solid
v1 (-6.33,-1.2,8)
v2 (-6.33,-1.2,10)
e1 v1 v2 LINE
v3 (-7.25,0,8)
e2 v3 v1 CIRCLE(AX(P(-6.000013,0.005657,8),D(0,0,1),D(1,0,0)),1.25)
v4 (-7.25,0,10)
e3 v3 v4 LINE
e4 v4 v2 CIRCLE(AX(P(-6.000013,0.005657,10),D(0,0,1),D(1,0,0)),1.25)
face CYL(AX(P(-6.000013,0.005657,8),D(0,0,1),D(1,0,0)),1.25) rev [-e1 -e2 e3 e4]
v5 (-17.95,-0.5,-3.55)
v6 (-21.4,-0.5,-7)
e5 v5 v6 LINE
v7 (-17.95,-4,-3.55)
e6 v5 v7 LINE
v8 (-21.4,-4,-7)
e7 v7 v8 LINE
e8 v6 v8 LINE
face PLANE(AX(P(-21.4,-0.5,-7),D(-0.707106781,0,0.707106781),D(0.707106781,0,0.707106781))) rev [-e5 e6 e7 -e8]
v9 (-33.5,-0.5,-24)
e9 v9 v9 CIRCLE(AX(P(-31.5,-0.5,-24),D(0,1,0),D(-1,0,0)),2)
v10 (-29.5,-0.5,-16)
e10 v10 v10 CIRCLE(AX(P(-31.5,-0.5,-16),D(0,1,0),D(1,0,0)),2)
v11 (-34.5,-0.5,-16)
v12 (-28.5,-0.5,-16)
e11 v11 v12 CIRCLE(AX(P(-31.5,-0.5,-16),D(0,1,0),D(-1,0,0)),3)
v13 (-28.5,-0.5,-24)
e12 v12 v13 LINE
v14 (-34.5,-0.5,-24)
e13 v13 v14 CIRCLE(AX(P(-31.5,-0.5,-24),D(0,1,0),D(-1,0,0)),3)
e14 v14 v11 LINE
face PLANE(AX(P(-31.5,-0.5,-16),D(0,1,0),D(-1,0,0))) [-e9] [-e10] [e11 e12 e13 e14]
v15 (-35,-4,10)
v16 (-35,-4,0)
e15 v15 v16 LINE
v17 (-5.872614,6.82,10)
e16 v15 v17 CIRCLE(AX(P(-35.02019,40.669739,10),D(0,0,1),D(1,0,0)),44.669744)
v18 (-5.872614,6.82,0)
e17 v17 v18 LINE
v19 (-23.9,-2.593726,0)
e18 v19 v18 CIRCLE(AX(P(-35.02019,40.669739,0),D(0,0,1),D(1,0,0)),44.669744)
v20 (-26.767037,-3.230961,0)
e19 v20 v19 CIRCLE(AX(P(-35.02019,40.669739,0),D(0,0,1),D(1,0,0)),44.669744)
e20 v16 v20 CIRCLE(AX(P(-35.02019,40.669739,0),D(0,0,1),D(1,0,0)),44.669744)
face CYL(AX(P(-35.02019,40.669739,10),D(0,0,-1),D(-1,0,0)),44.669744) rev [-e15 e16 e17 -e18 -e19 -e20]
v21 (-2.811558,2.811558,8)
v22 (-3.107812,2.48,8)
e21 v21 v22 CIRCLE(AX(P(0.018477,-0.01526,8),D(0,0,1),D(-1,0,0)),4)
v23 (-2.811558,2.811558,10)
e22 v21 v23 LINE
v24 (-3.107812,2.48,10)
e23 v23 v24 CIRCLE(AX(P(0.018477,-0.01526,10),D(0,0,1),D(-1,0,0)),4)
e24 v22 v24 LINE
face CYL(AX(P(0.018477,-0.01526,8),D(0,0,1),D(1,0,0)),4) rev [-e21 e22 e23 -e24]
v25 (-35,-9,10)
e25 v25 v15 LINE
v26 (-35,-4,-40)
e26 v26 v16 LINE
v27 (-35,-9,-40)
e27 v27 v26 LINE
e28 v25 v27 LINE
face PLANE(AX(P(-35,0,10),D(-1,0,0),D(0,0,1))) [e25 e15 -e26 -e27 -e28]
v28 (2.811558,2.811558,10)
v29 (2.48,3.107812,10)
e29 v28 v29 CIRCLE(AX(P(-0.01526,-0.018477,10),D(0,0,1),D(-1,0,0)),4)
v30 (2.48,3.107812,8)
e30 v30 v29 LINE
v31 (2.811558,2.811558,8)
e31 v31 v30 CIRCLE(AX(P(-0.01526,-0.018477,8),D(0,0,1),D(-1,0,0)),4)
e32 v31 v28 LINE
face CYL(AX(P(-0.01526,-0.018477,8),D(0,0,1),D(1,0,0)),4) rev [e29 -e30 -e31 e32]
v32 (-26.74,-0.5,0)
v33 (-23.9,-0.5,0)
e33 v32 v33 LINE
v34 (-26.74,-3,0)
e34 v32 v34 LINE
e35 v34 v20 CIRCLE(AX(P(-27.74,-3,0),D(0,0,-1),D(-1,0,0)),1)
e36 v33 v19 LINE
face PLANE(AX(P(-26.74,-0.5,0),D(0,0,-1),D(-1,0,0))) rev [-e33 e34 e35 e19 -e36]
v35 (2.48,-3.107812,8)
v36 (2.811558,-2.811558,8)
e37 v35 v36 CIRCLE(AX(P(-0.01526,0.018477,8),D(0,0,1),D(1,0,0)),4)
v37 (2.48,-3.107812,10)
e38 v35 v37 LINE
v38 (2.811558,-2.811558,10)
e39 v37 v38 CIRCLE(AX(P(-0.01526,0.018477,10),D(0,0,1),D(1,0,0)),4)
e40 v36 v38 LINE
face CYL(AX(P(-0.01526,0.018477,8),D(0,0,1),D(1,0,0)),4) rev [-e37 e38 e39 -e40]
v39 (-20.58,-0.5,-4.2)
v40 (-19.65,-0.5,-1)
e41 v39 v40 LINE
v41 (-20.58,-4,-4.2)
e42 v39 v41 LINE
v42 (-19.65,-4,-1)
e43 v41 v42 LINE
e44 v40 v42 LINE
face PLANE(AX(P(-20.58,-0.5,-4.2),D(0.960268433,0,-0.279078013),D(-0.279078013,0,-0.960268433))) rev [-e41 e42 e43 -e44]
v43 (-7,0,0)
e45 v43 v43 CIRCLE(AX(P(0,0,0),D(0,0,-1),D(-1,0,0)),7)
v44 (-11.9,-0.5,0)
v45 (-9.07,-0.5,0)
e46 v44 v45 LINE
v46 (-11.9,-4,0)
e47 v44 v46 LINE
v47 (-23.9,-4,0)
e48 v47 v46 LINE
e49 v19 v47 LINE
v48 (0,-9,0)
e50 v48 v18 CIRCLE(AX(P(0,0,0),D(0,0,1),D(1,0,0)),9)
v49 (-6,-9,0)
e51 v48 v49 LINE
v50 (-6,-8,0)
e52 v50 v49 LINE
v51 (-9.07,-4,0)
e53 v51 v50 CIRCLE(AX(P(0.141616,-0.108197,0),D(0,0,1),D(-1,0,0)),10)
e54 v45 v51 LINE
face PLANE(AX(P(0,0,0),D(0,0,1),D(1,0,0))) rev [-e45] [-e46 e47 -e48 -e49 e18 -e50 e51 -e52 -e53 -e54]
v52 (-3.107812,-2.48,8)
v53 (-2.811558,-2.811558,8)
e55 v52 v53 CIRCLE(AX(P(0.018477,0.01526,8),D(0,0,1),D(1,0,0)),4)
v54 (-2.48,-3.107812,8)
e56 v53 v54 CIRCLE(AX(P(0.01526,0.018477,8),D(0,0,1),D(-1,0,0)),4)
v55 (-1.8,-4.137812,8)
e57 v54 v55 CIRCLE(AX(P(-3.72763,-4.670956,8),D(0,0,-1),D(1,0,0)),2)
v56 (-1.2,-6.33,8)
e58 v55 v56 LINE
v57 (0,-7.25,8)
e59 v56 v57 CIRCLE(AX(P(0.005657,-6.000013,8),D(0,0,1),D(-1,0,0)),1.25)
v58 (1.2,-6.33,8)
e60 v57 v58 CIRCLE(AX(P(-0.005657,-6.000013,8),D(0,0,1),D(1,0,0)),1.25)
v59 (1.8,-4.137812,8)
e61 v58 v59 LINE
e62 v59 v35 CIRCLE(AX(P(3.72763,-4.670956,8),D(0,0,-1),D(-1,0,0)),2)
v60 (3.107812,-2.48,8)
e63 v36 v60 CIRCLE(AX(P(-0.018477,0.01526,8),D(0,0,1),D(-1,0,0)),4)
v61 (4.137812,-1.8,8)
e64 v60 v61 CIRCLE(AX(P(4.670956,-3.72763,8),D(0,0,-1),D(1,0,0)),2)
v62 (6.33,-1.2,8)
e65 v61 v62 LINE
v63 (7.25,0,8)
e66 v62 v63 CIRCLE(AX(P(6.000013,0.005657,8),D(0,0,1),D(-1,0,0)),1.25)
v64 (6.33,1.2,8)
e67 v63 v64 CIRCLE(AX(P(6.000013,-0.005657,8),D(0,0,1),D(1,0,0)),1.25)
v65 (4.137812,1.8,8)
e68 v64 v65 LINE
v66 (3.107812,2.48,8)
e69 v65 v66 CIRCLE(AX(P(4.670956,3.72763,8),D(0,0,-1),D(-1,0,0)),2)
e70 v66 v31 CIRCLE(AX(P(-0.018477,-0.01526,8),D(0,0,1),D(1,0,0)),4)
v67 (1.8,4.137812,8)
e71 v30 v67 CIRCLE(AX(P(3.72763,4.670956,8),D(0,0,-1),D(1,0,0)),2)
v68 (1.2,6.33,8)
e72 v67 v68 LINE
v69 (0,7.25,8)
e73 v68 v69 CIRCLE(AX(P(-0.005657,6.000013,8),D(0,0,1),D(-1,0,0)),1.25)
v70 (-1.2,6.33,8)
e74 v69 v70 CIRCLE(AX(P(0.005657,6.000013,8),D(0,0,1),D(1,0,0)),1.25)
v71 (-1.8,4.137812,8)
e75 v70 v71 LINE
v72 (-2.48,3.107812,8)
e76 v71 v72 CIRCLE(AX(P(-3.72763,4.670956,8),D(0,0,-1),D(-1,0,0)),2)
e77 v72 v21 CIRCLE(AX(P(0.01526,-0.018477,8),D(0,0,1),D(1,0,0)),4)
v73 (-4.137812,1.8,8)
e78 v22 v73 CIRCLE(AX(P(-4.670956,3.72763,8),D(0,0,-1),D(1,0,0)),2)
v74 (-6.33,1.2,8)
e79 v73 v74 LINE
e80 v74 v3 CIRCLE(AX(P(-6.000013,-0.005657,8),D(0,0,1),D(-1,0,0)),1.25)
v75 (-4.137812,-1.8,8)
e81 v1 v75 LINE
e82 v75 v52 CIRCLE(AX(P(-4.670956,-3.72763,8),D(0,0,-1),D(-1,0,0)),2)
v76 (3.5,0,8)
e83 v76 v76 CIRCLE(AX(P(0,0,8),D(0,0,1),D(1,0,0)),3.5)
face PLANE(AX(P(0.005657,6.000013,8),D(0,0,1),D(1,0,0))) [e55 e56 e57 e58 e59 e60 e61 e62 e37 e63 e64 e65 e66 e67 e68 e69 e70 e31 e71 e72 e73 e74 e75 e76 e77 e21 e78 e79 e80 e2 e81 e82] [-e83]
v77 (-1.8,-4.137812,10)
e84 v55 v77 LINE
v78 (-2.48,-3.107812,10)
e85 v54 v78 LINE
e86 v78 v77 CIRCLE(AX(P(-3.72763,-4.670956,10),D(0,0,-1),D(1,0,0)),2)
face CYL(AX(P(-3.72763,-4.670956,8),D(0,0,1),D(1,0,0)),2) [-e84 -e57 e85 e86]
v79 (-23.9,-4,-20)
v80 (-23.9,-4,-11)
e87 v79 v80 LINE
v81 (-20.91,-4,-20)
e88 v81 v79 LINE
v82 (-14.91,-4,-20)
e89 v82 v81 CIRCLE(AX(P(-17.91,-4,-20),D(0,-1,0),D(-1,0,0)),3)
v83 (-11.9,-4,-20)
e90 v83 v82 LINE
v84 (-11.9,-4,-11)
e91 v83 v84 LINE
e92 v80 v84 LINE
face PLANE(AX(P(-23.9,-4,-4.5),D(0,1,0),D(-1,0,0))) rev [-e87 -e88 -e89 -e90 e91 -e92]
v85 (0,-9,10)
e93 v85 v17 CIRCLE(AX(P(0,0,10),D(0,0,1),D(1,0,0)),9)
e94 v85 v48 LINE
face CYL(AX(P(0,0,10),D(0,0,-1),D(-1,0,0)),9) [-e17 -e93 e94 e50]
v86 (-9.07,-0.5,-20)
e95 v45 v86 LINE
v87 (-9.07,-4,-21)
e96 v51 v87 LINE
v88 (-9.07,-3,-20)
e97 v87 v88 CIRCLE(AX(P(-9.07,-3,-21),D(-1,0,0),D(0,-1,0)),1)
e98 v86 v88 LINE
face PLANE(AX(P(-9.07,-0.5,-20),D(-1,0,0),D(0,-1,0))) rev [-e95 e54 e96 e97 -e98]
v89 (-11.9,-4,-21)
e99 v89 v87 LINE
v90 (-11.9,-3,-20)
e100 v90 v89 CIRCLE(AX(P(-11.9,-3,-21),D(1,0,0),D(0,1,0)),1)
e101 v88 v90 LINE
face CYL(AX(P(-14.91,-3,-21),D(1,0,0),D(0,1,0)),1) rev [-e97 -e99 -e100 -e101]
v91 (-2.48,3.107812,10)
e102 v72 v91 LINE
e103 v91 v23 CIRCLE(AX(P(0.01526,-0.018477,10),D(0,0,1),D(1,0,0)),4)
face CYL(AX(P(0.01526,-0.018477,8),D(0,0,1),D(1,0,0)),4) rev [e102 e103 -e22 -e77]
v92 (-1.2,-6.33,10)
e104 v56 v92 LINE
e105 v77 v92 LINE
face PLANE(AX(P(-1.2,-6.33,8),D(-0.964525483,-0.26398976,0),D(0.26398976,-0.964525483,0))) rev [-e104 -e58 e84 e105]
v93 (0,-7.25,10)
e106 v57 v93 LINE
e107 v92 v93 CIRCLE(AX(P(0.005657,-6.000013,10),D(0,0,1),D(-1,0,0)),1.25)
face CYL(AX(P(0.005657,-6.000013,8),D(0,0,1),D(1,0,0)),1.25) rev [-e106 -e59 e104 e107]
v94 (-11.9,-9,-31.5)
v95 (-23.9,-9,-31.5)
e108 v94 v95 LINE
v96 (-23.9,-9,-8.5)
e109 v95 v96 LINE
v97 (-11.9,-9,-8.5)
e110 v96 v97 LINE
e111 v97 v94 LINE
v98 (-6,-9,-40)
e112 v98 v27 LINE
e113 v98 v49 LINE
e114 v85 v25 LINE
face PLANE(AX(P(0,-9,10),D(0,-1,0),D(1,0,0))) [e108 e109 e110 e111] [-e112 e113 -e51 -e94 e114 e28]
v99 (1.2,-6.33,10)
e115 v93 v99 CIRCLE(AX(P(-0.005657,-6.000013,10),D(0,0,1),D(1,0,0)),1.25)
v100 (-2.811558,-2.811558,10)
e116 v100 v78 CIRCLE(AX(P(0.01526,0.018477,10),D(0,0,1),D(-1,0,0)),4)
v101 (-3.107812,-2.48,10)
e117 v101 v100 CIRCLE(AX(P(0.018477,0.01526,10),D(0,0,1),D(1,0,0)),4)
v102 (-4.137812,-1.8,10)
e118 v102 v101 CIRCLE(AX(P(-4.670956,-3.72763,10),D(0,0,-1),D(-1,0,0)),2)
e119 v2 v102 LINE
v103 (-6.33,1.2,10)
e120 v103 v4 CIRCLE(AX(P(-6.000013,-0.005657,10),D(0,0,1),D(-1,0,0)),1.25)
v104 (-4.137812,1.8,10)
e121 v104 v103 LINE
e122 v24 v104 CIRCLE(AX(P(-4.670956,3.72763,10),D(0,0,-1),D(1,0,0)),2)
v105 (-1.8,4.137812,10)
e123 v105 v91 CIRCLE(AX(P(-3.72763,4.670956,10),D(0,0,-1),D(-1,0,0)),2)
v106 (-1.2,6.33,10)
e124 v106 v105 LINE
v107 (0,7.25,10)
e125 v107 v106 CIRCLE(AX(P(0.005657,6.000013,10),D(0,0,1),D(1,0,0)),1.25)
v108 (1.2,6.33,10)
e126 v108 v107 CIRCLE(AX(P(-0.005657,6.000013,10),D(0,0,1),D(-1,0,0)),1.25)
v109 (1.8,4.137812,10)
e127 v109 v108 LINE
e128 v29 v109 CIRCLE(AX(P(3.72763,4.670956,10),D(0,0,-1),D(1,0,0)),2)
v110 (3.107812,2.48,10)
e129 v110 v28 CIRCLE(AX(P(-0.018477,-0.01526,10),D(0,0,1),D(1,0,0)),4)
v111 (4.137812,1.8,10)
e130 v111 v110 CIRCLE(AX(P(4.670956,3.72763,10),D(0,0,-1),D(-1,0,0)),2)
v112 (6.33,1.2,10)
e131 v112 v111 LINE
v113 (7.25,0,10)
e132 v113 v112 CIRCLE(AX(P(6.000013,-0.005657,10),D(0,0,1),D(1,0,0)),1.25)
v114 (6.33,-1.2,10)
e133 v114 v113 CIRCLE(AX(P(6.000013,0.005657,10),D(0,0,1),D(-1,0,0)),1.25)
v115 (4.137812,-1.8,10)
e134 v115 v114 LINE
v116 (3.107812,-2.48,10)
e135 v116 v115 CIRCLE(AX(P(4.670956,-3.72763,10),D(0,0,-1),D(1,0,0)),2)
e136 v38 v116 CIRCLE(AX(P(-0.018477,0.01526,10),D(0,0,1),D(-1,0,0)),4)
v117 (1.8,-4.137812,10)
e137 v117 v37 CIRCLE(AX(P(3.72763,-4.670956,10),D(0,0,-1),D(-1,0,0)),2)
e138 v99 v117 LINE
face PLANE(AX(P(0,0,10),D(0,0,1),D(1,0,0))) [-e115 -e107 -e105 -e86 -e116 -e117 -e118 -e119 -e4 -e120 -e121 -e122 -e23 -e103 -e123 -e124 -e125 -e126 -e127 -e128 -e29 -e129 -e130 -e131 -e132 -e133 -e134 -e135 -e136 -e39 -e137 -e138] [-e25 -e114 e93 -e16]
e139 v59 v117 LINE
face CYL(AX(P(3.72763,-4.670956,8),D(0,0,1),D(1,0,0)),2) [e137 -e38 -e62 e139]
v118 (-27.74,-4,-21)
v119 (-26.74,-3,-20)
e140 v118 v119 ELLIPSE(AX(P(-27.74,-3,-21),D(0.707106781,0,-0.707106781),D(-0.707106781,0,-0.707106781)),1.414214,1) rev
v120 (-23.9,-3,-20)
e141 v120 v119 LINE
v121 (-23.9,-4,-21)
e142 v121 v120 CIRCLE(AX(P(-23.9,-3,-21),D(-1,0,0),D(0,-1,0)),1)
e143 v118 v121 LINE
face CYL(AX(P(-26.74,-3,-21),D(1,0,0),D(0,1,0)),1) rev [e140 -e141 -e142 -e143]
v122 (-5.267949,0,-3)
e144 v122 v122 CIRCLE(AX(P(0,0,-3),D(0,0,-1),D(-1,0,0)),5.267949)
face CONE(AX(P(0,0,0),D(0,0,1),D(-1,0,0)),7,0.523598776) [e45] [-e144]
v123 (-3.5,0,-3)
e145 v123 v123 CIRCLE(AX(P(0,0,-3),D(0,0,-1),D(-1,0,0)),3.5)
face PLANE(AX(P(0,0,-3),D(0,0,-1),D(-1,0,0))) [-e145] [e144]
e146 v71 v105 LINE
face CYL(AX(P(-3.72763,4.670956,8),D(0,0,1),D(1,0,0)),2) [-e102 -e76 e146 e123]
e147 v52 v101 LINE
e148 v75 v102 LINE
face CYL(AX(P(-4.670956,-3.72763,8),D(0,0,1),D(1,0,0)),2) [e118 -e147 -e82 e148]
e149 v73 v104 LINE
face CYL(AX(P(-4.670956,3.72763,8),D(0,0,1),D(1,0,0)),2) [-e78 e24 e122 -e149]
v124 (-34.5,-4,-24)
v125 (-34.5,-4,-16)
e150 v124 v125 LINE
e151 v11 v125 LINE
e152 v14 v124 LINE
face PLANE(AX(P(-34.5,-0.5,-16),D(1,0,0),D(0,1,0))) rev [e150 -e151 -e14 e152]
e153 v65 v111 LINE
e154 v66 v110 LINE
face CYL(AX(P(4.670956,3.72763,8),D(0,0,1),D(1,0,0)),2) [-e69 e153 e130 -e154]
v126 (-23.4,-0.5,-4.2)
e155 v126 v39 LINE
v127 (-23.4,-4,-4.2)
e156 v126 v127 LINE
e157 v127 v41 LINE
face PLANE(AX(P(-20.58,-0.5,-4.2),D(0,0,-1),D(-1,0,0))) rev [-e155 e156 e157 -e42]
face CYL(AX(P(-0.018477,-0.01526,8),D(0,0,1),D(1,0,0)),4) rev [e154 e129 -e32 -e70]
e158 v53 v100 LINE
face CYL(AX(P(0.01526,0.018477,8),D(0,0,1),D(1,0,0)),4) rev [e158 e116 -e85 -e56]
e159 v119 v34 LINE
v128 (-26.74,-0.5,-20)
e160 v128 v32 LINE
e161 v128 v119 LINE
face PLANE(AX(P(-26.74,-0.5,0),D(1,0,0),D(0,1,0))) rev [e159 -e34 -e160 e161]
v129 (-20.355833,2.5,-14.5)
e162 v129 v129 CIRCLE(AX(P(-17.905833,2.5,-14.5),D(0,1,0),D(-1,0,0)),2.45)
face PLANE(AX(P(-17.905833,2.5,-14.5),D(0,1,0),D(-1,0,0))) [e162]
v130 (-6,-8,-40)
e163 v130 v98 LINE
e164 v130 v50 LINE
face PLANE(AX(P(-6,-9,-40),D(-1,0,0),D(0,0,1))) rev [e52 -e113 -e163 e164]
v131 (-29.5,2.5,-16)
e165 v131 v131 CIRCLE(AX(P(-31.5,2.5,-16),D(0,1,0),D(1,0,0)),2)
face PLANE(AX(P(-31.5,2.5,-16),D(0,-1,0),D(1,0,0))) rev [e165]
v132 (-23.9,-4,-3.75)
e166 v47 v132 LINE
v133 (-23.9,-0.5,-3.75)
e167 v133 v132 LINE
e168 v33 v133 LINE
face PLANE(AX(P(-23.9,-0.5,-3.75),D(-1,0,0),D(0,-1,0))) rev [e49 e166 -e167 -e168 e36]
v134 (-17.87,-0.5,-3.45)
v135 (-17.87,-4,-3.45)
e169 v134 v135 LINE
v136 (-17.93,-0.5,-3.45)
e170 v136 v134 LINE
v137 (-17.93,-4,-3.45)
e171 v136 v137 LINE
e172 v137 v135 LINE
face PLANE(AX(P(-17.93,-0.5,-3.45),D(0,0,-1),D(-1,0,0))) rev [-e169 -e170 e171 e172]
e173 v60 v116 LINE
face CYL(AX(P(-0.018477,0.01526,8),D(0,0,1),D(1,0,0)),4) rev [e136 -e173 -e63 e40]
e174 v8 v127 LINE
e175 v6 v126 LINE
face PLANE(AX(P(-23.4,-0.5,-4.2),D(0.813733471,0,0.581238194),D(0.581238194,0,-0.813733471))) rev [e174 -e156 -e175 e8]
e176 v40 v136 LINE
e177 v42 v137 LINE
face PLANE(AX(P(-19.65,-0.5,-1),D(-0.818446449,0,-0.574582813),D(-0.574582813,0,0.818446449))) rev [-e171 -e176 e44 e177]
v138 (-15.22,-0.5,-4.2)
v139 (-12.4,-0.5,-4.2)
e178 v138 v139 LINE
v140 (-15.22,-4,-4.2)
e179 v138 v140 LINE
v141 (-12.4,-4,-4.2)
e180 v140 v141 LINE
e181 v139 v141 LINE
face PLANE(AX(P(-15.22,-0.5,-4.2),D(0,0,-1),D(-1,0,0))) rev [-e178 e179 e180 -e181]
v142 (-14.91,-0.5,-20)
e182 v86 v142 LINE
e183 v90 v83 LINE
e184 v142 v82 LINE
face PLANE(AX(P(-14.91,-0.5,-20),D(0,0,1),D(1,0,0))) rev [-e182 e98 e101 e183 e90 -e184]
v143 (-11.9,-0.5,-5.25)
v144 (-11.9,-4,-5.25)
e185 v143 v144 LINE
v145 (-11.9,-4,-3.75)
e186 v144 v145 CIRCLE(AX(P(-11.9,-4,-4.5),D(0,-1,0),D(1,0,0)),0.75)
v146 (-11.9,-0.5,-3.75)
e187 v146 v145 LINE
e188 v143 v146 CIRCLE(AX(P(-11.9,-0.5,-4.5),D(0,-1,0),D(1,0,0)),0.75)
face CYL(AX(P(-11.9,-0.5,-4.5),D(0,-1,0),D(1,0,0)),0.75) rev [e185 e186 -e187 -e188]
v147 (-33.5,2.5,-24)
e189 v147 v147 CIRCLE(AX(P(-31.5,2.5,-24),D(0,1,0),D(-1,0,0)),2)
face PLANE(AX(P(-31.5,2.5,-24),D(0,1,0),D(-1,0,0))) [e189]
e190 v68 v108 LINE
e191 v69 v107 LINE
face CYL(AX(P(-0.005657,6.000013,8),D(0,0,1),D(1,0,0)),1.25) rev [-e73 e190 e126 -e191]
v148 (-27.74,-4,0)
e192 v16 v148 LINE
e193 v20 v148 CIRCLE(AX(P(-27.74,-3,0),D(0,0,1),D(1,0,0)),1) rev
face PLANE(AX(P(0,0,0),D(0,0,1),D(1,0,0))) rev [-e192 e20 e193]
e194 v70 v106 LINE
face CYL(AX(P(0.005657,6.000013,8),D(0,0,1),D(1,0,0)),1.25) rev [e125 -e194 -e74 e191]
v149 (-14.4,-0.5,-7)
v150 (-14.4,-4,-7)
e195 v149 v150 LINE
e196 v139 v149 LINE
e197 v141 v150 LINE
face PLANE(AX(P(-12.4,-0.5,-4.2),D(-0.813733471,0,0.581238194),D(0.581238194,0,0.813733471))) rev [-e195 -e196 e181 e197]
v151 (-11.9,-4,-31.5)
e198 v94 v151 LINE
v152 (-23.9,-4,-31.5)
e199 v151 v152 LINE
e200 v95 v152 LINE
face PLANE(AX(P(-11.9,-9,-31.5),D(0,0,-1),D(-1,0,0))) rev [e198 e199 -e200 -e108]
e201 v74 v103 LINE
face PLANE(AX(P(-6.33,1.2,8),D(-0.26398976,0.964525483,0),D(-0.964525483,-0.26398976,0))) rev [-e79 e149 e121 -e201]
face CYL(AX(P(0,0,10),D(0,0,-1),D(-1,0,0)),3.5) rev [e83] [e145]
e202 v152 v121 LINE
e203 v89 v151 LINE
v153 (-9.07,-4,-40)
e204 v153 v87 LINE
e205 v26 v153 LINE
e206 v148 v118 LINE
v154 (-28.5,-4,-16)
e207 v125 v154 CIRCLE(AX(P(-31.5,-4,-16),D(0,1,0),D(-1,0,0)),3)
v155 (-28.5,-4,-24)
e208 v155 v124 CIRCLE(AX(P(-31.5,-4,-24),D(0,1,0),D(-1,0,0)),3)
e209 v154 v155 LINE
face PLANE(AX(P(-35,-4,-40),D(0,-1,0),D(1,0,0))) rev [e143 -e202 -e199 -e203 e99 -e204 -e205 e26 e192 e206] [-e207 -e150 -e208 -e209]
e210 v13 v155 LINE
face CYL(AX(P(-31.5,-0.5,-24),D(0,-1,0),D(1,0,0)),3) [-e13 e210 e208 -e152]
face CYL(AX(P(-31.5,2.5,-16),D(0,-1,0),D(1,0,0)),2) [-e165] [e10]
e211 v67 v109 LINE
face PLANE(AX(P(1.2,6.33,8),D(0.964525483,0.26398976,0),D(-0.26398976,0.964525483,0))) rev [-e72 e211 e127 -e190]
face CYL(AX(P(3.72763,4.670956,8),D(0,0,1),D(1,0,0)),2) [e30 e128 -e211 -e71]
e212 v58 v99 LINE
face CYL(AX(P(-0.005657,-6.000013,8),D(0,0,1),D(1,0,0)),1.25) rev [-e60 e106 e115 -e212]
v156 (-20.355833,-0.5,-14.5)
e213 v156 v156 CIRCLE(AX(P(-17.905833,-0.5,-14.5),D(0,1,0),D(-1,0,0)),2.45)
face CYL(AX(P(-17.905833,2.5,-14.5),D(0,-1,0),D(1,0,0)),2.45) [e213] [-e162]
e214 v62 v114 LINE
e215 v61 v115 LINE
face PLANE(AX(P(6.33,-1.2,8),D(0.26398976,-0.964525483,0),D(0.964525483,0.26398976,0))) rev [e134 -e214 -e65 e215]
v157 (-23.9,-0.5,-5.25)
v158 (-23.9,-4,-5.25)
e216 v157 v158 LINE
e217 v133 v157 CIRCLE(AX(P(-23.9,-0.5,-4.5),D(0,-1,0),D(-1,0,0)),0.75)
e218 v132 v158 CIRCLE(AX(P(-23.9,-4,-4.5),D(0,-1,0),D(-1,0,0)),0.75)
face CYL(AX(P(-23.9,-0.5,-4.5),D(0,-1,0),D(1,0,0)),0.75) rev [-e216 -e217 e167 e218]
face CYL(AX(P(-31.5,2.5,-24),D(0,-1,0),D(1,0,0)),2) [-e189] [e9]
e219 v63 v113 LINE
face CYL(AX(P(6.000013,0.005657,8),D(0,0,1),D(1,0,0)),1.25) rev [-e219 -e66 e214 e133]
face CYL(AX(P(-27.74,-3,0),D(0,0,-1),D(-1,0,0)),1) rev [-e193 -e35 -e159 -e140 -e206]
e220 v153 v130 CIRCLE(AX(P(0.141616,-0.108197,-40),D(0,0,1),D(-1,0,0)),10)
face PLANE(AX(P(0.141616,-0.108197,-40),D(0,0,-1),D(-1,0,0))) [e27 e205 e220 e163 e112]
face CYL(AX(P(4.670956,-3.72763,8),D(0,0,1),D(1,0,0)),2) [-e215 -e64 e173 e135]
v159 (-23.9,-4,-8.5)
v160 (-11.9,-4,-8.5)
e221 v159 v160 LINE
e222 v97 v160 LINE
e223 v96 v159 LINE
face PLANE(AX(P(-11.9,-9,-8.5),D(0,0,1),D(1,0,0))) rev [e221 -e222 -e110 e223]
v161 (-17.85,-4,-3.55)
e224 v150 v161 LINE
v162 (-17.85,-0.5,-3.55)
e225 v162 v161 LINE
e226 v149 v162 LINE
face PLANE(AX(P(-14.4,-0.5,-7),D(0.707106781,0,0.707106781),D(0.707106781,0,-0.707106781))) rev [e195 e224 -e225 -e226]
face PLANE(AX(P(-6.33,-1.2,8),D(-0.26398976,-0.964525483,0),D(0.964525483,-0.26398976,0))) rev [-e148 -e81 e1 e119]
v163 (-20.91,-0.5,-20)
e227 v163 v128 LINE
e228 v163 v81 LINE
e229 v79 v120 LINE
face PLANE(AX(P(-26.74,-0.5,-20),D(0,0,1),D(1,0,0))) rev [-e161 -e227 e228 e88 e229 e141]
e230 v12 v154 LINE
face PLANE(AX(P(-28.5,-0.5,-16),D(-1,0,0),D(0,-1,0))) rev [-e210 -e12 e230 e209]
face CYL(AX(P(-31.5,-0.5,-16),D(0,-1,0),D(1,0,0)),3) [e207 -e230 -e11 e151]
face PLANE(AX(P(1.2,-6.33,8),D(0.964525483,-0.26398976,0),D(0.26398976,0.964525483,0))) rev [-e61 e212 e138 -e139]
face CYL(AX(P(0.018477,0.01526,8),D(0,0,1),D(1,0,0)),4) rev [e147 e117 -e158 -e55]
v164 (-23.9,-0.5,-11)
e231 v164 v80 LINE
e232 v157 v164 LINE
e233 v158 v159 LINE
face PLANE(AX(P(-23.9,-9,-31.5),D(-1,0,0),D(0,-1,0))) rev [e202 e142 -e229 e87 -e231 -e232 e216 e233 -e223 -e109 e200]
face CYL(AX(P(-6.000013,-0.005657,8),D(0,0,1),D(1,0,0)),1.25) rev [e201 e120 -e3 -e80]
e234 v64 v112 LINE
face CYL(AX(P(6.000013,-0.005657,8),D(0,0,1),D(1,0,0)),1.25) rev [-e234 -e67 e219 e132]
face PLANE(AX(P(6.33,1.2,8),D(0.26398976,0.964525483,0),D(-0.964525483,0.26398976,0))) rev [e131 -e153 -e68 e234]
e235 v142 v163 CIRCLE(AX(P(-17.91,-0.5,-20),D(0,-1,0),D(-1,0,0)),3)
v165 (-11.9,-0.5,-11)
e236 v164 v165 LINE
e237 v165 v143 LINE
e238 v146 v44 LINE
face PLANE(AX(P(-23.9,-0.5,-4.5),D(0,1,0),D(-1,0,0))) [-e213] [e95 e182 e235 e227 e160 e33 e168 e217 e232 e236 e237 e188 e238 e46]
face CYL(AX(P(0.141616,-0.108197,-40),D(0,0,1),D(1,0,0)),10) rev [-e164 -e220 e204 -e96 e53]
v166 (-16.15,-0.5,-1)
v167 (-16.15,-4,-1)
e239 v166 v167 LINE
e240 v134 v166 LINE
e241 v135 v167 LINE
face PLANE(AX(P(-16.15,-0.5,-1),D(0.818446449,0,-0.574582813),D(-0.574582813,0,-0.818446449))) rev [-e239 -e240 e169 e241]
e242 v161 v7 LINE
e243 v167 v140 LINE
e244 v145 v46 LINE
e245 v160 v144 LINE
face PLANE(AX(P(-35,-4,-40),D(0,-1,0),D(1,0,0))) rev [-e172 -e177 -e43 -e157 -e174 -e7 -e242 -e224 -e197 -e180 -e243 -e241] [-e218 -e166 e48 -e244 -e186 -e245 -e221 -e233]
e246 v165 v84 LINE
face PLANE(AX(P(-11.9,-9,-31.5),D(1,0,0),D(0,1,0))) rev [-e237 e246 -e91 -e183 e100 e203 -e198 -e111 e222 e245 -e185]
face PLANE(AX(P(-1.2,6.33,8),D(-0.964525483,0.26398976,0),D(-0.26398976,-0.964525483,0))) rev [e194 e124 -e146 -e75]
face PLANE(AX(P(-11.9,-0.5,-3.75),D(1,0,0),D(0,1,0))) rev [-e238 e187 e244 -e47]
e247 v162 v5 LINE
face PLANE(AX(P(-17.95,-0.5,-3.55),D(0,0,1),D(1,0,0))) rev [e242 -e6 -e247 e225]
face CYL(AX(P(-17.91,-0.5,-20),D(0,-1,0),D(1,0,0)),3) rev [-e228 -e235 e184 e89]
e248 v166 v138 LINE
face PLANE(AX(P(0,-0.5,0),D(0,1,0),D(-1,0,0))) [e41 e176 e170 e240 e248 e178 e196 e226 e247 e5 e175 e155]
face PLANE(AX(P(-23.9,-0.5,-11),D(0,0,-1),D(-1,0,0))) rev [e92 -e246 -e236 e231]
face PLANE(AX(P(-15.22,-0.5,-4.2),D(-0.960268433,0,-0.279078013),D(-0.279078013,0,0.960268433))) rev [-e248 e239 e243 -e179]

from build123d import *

# Parameters (mm, degrees)
SKETCH2_R           = 9
BOSS_EXTRUDE1_DEPTH = 10
SKETCH3_R           = 7
BOSS_EXTRUDE2_DEPTH = 3
BOSS_EXTRUDE2_TAPER = 30
CUT_EXTRUDE1_DEPTH  = 2
BOSS_EXTRUDE3_DEPTH = 40
SKETCH6_W           = 12
SKETCH6_H           = 23
CUT_EXTRUDE3_DEPTH  = 55.717456081
BOSS_EXTRUDE4_DEPTH = 3.5
SKETCH8_R           = 2
BOSS_EXTRUDE5_DEPTH = 3
SKETCH9_R           = 3.5
CUT_EXTRUDE4_DEPTH  = 52.720402164
BOSS_EXTRUDE6_DEPTH = 3.5
SKETCH11_R          = 2.45
BOSS_EXTRUDE7_DEPTH = 3
BOSS_EXTRUDE9_DEPTH = 3.5
FILLET1_START       = -26.74
FILLET1_DEPTH       = 2.84
FILLET1_START_2     = -11.9
FILLET1_2_DEPTH     = 2.83
FILLET1_START_3     = -21
FILLET1_3_DEPTH     = 21
FILLET1_START_4     = -27.74
FILLET1_4_DEPTH     = 1


with BuildPart() as part:
    # Sketch2 → Boss-Extrude1 (new body)
    with BuildSketch(Plane.XY):
        with BuildLine():
            Line((-35, -9), (0, -9))
            ThreePointArc((0, -9), (-8.437416666, -3.132091953), (-5.872614409, 6.82))
            ThreePointArc((-5.872614409, 6.82), (-19.465199243, -1.204217751), (-35, -4))
            Line((-35, -4), (-35, -9))
        make_face()
        Circle(SKETCH2_R)
    extrude(amount=BOSS_EXTRUDE1_DEPTH)

    # Sketch3 → Boss-Extrude2 (add)
    with BuildSketch(Plane(origin=(0, 0, 0), x_dir=(-1, 0, 0), z_dir=(0, 0, -1))):
        Circle(SKETCH3_R)
    extrude(amount=BOSS_EXTRUDE2_DEPTH, taper=BOSS_EXTRUDE2_TAPER)

    # Sketch4 → Cut-Extrude1 (cut)
    with BuildSketch(Plane.XY.offset(10)):
        with BuildLine():
            Line((1.2, -6.33), (1.8, -4.1378116))
            ThreePointArc((1.8, -4.1378116), (2.058560194, -3.569045514), (2.48, -3.1078116))
            ThreePointArc((2.48, -3.1078116), (2.64989874, -2.964295475), (2.811558399, -2.811558399))
            ThreePointArc((2.811558399, -2.811558399), (2.964295475, -2.64989874), (3.1078116, -2.48))
            ThreePointArc((3.1078116, -2.48), (3.569045514, -2.058560194), (4.1378116, -1.8))
            Line((4.1378116, -1.8), (6.33, -1.2))
            ThreePointArc((6.33, -1.2), (6.992020752, -0.754882576), (7.25, 0))
            ThreePointArc((7.25, 0), (6.992020752, 0.754882576), (6.33, 1.2))
            Line((6.33, 1.2), (4.1378116, 1.8))
            ThreePointArc((4.1378116, 1.8), (3.569045514, 2.058560194), (3.1078116, 2.48))
            ThreePointArc((3.1078116, 2.48), (2.964295475, 2.64989874), (2.811558399, 2.811558399))
            ThreePointArc((2.811558399, 2.811558399), (2.64989874, 2.964295475), (2.48, 3.1078116))
            ThreePointArc((2.48, 3.1078116), (2.058560194, 3.569045514), (1.8, 4.1378116))
            Line((1.8, 4.1378116), (1.2, 6.33))
            ThreePointArc((1.2, 6.33), (0.754882576, 6.992020752), (0, 7.25))
            ThreePointArc((0, 7.25), (-0.754882576, 6.992020752), (-1.2, 6.33))
            Line((-1.2, 6.33), (-1.8, 4.1378116))
            ThreePointArc((-1.8, 4.1378116), (-2.058560194, 3.569045514), (-2.48, 3.1078116))
            ThreePointArc((-2.48, 3.1078116), (-2.64989874, 2.964295475), (-2.811558399, 2.811558399))
            ThreePointArc((-2.811558399, 2.811558399), (-2.964295475, 2.64989874), (-3.1078116, 2.48))
            ThreePointArc((-3.1078116, 2.48), (-3.569045514, 2.058560194), (-4.1378116, 1.8))
            Line((-4.1378116, 1.8), (-6.33, 1.2))
            ThreePointArc((-6.33, 1.2), (-6.992020752, 0.754882576), (-7.25, 0))
            ThreePointArc((-7.25, 0), (-6.992020752, -0.754882576), (-6.33, -1.2))
            Line((-6.33, -1.2), (-4.1378116, -1.8))
            ThreePointArc((-4.1378116, -1.8), (-3.569045514, -2.058560194), (-3.1078116, -2.48))
            ThreePointArc((-3.1078116, -2.48), (-2.964295475, -2.64989874), (-2.811558399, -2.811558399))
            ThreePointArc((-2.811558399, -2.811558399), (-2.64989874, -2.964295475), (-2.48, -3.1078116))
            ThreePointArc((-2.48, -3.1078116), (-2.058560194, -3.569045514), (-1.8, -4.1378116))
            Line((-1.8, -4.1378116), (-1.2, -6.33))
            ThreePointArc((-1.2, -6.33), (-0.754882576, -6.992020752), (0, -7.25))
            ThreePointArc((0, -7.25), (0.754882576, -6.992020752), (1.2, -6.33))
        make_face()
    extrude(amount=-CUT_EXTRUDE1_DEPTH, mode=Mode.SUBTRACT)

    # Sketch5 → Boss-Extrude3 (add)
    with BuildSketch(Plane(origin=(0, 0, 0), x_dir=(-1, 0, 0), z_dir=(0, 0, -1))):
        with BuildLine():
            Line((35, -9), (35, -4))
            Line((35, -4), (9.07, -4))
            ThreePointArc((9.07, -4), (7.791254425, -6.196675271), (6, -8))
            Line((6, -8), (6, -9))
            Line((6, -9), (35, -9))
        make_face()
    extrude(amount=BOSS_EXTRUDE3_DEPTH)

    # Sketch6 → Cut-Extrude3 (cut, through all)
    with BuildSketch(Plane(origin=(0, -4, 0), x_dir=(1, 0, 0), z_dir=(0, 1, 0))):
        with Locations((-17.9, 20)):
            Rectangle(SKETCH6_W, SKETCH6_H)
    extrude(amount=-CUT_EXTRUDE3_DEPTH, mode=Mode.SUBTRACT)

    # Sketch7 → Boss-Extrude4 (add)
    with BuildSketch(Plane(origin=(0, -4, 0), x_dir=(1, 0, 0), z_dir=(0, 1, 0))):
        with BuildLine():
            Line((-34.5, 16), (-34.5, 24))
            ThreePointArc((-34.5, 24), (-31.5, 27), (-28.5, 24))
            Line((-28.5, 24), (-28.5, 16))
            ThreePointArc((-28.5, 16), (-31.5, 13), (-34.5, 16))
        make_face()
    extrude(amount=BOSS_EXTRUDE4_DEPTH)

    # Sketch8 → Boss-Extrude5 (add)
    with BuildSketch(Plane(origin=(0, -0.5, 0), x_dir=(1, 0, 0), z_dir=(0, 1, 0))):
        with Locations(Location((-31.5, 24, 0), (0, 0, 180))):
            Circle(SKETCH8_R)
        with Locations((-31.5, 16)):
            Circle(SKETCH8_R)
    extrude(amount=BOSS_EXTRUDE5_DEPTH)

    # Sketch9 → Cut-Extrude4 (cut, through all)
    with BuildSketch(Plane(origin=(0, 0, -3), x_dir=(-1, 0, 0), z_dir=(0, 0, -1))):
        Circle(SKETCH9_R)
    extrude(amount=-CUT_EXTRUDE4_DEPTH, mode=Mode.SUBTRACT)

    # Sketch10 → Boss-Extrude6 (add)
    with BuildSketch(Plane(origin=(0, -4, 0), x_dir=(1, 0, 0), z_dir=(0, 1, 0))):
        with BuildLine():
            Line((-26.74, 0), (-26.74, 20))
            Line((-26.74, 20), (-20.91, 20))
            ThreePointArc((-20.91, 20), (-17.91, 17), (-14.91, 20))
            Line((-14.91, 20), (-9.07, 20))
            Line((-9.07, 20), (-9.07, 0))
            Line((-9.07, 0), (-11.9, 0))
            Line((-11.9, 0), (-11.9, 3.75))
            ThreePointArc((-11.9, 3.75), (-11.15, 4.5), (-11.9, 5.25))
            Line((-11.9, 5.25), (-11.9, 11))
            Line((-11.9, 11), (-23.9, 11))
            Line((-23.9, 11), (-23.9, 5.25))
            ThreePointArc((-23.9, 5.25), (-24.65, 4.5), (-23.9, 3.75))
            Line((-23.9, 3.75), (-23.9, 0))
            Line((-23.9, 0), (-26.74, 0))
        make_face()
    extrude(amount=BOSS_EXTRUDE6_DEPTH)

    # Sketch11 → Boss-Extrude7 (add)
    with BuildSketch(Plane(origin=(0, -0.5, 0), x_dir=(1, 0, 0), z_dir=(0, 1, 0))):
        with Locations(Location((-17.905833333, 14.5, 0), (0, 0, 180))):
            Circle(SKETCH11_R)
    extrude(amount=BOSS_EXTRUDE7_DEPTH)

    # Sketch12 → Boss-Extrude9 (add)
    with BuildSketch(Plane(origin=(0, -4, 0), x_dir=(1, 0, 0), z_dir=(0, 1, 0))):
        Polygon((-20.58, 4.2), (-19.65, 1), (-17.93, 3.45), (-17.87, 3.45), (-16.15, 1), (-15.22, 4.2), (-12.4, 4.2), (-14.4, 7), (-17.85, 3.55), (-17.95, 3.55), (-21.4, 7), (-23.4, 4.2), align=None)
    extrude(amount=BOSS_EXTRUDE9_DEPTH)

    # Fillet1: read off the stored shape, not the designer's step
    # Fillet1 outline → Fillet1 (add)
    with BuildSketch(Plane.YZ.offset(FILLET1_START)):
        with BuildLine():
            ThreePointArc((-4, -21), (-3.707106781, -20.292893219), (-3, -20))
            Line((-3, -20), (-4, -20))
            Line((-4, -20), (-4, -21))
        make_face()
    extrude(amount=FILLET1_DEPTH)

    # Fillet1 2 outline → Fillet1 2 (add)
    with BuildSketch(Plane.YZ.offset(FILLET1_START_2)):
        with BuildLine():
            ThreePointArc((-4, -21), (-3.707106781, -20.292893219), (-3, -20))
            Line((-3, -20), (-4, -20))
            Line((-4, -20), (-4, -21))
        make_face()
    extrude(amount=FILLET1_2_DEPTH)

    # Fillet1 3 outline → Fillet1 3 (add)
    with BuildSketch(Plane.XY.offset(FILLET1_START_3)):
        with BuildLine():
            Line((-26.74, -4), (-26.74, -3))
            ThreePointArc((-26.74, -3), (-27.032893219, -3.707106781), (-27.74, -4))
            Line((-27.74, -4), (-26.74, -4))
        make_face()
    extrude(amount=FILLET1_3_DEPTH)

    # Fillet1 4 outline → Fillet1 4 (cut)
    with BuildSketch(Plane.YZ.offset(FILLET1_START_4)):
        with BuildLine():
            Line((-2, -19.999999999), (-3, -20))
            ThreePointArc((-3, -20), (-3.707106781, -20.292893219), (-4, -21))
            Line((-4, -21), (-2, -21))
            Line((-2, -21), (-2, -19.999999999))
        make_face()
    extrude(amount=FILLET1_4_DEPTH, mode=Mode.SUBTRACT)


solid = part.part
